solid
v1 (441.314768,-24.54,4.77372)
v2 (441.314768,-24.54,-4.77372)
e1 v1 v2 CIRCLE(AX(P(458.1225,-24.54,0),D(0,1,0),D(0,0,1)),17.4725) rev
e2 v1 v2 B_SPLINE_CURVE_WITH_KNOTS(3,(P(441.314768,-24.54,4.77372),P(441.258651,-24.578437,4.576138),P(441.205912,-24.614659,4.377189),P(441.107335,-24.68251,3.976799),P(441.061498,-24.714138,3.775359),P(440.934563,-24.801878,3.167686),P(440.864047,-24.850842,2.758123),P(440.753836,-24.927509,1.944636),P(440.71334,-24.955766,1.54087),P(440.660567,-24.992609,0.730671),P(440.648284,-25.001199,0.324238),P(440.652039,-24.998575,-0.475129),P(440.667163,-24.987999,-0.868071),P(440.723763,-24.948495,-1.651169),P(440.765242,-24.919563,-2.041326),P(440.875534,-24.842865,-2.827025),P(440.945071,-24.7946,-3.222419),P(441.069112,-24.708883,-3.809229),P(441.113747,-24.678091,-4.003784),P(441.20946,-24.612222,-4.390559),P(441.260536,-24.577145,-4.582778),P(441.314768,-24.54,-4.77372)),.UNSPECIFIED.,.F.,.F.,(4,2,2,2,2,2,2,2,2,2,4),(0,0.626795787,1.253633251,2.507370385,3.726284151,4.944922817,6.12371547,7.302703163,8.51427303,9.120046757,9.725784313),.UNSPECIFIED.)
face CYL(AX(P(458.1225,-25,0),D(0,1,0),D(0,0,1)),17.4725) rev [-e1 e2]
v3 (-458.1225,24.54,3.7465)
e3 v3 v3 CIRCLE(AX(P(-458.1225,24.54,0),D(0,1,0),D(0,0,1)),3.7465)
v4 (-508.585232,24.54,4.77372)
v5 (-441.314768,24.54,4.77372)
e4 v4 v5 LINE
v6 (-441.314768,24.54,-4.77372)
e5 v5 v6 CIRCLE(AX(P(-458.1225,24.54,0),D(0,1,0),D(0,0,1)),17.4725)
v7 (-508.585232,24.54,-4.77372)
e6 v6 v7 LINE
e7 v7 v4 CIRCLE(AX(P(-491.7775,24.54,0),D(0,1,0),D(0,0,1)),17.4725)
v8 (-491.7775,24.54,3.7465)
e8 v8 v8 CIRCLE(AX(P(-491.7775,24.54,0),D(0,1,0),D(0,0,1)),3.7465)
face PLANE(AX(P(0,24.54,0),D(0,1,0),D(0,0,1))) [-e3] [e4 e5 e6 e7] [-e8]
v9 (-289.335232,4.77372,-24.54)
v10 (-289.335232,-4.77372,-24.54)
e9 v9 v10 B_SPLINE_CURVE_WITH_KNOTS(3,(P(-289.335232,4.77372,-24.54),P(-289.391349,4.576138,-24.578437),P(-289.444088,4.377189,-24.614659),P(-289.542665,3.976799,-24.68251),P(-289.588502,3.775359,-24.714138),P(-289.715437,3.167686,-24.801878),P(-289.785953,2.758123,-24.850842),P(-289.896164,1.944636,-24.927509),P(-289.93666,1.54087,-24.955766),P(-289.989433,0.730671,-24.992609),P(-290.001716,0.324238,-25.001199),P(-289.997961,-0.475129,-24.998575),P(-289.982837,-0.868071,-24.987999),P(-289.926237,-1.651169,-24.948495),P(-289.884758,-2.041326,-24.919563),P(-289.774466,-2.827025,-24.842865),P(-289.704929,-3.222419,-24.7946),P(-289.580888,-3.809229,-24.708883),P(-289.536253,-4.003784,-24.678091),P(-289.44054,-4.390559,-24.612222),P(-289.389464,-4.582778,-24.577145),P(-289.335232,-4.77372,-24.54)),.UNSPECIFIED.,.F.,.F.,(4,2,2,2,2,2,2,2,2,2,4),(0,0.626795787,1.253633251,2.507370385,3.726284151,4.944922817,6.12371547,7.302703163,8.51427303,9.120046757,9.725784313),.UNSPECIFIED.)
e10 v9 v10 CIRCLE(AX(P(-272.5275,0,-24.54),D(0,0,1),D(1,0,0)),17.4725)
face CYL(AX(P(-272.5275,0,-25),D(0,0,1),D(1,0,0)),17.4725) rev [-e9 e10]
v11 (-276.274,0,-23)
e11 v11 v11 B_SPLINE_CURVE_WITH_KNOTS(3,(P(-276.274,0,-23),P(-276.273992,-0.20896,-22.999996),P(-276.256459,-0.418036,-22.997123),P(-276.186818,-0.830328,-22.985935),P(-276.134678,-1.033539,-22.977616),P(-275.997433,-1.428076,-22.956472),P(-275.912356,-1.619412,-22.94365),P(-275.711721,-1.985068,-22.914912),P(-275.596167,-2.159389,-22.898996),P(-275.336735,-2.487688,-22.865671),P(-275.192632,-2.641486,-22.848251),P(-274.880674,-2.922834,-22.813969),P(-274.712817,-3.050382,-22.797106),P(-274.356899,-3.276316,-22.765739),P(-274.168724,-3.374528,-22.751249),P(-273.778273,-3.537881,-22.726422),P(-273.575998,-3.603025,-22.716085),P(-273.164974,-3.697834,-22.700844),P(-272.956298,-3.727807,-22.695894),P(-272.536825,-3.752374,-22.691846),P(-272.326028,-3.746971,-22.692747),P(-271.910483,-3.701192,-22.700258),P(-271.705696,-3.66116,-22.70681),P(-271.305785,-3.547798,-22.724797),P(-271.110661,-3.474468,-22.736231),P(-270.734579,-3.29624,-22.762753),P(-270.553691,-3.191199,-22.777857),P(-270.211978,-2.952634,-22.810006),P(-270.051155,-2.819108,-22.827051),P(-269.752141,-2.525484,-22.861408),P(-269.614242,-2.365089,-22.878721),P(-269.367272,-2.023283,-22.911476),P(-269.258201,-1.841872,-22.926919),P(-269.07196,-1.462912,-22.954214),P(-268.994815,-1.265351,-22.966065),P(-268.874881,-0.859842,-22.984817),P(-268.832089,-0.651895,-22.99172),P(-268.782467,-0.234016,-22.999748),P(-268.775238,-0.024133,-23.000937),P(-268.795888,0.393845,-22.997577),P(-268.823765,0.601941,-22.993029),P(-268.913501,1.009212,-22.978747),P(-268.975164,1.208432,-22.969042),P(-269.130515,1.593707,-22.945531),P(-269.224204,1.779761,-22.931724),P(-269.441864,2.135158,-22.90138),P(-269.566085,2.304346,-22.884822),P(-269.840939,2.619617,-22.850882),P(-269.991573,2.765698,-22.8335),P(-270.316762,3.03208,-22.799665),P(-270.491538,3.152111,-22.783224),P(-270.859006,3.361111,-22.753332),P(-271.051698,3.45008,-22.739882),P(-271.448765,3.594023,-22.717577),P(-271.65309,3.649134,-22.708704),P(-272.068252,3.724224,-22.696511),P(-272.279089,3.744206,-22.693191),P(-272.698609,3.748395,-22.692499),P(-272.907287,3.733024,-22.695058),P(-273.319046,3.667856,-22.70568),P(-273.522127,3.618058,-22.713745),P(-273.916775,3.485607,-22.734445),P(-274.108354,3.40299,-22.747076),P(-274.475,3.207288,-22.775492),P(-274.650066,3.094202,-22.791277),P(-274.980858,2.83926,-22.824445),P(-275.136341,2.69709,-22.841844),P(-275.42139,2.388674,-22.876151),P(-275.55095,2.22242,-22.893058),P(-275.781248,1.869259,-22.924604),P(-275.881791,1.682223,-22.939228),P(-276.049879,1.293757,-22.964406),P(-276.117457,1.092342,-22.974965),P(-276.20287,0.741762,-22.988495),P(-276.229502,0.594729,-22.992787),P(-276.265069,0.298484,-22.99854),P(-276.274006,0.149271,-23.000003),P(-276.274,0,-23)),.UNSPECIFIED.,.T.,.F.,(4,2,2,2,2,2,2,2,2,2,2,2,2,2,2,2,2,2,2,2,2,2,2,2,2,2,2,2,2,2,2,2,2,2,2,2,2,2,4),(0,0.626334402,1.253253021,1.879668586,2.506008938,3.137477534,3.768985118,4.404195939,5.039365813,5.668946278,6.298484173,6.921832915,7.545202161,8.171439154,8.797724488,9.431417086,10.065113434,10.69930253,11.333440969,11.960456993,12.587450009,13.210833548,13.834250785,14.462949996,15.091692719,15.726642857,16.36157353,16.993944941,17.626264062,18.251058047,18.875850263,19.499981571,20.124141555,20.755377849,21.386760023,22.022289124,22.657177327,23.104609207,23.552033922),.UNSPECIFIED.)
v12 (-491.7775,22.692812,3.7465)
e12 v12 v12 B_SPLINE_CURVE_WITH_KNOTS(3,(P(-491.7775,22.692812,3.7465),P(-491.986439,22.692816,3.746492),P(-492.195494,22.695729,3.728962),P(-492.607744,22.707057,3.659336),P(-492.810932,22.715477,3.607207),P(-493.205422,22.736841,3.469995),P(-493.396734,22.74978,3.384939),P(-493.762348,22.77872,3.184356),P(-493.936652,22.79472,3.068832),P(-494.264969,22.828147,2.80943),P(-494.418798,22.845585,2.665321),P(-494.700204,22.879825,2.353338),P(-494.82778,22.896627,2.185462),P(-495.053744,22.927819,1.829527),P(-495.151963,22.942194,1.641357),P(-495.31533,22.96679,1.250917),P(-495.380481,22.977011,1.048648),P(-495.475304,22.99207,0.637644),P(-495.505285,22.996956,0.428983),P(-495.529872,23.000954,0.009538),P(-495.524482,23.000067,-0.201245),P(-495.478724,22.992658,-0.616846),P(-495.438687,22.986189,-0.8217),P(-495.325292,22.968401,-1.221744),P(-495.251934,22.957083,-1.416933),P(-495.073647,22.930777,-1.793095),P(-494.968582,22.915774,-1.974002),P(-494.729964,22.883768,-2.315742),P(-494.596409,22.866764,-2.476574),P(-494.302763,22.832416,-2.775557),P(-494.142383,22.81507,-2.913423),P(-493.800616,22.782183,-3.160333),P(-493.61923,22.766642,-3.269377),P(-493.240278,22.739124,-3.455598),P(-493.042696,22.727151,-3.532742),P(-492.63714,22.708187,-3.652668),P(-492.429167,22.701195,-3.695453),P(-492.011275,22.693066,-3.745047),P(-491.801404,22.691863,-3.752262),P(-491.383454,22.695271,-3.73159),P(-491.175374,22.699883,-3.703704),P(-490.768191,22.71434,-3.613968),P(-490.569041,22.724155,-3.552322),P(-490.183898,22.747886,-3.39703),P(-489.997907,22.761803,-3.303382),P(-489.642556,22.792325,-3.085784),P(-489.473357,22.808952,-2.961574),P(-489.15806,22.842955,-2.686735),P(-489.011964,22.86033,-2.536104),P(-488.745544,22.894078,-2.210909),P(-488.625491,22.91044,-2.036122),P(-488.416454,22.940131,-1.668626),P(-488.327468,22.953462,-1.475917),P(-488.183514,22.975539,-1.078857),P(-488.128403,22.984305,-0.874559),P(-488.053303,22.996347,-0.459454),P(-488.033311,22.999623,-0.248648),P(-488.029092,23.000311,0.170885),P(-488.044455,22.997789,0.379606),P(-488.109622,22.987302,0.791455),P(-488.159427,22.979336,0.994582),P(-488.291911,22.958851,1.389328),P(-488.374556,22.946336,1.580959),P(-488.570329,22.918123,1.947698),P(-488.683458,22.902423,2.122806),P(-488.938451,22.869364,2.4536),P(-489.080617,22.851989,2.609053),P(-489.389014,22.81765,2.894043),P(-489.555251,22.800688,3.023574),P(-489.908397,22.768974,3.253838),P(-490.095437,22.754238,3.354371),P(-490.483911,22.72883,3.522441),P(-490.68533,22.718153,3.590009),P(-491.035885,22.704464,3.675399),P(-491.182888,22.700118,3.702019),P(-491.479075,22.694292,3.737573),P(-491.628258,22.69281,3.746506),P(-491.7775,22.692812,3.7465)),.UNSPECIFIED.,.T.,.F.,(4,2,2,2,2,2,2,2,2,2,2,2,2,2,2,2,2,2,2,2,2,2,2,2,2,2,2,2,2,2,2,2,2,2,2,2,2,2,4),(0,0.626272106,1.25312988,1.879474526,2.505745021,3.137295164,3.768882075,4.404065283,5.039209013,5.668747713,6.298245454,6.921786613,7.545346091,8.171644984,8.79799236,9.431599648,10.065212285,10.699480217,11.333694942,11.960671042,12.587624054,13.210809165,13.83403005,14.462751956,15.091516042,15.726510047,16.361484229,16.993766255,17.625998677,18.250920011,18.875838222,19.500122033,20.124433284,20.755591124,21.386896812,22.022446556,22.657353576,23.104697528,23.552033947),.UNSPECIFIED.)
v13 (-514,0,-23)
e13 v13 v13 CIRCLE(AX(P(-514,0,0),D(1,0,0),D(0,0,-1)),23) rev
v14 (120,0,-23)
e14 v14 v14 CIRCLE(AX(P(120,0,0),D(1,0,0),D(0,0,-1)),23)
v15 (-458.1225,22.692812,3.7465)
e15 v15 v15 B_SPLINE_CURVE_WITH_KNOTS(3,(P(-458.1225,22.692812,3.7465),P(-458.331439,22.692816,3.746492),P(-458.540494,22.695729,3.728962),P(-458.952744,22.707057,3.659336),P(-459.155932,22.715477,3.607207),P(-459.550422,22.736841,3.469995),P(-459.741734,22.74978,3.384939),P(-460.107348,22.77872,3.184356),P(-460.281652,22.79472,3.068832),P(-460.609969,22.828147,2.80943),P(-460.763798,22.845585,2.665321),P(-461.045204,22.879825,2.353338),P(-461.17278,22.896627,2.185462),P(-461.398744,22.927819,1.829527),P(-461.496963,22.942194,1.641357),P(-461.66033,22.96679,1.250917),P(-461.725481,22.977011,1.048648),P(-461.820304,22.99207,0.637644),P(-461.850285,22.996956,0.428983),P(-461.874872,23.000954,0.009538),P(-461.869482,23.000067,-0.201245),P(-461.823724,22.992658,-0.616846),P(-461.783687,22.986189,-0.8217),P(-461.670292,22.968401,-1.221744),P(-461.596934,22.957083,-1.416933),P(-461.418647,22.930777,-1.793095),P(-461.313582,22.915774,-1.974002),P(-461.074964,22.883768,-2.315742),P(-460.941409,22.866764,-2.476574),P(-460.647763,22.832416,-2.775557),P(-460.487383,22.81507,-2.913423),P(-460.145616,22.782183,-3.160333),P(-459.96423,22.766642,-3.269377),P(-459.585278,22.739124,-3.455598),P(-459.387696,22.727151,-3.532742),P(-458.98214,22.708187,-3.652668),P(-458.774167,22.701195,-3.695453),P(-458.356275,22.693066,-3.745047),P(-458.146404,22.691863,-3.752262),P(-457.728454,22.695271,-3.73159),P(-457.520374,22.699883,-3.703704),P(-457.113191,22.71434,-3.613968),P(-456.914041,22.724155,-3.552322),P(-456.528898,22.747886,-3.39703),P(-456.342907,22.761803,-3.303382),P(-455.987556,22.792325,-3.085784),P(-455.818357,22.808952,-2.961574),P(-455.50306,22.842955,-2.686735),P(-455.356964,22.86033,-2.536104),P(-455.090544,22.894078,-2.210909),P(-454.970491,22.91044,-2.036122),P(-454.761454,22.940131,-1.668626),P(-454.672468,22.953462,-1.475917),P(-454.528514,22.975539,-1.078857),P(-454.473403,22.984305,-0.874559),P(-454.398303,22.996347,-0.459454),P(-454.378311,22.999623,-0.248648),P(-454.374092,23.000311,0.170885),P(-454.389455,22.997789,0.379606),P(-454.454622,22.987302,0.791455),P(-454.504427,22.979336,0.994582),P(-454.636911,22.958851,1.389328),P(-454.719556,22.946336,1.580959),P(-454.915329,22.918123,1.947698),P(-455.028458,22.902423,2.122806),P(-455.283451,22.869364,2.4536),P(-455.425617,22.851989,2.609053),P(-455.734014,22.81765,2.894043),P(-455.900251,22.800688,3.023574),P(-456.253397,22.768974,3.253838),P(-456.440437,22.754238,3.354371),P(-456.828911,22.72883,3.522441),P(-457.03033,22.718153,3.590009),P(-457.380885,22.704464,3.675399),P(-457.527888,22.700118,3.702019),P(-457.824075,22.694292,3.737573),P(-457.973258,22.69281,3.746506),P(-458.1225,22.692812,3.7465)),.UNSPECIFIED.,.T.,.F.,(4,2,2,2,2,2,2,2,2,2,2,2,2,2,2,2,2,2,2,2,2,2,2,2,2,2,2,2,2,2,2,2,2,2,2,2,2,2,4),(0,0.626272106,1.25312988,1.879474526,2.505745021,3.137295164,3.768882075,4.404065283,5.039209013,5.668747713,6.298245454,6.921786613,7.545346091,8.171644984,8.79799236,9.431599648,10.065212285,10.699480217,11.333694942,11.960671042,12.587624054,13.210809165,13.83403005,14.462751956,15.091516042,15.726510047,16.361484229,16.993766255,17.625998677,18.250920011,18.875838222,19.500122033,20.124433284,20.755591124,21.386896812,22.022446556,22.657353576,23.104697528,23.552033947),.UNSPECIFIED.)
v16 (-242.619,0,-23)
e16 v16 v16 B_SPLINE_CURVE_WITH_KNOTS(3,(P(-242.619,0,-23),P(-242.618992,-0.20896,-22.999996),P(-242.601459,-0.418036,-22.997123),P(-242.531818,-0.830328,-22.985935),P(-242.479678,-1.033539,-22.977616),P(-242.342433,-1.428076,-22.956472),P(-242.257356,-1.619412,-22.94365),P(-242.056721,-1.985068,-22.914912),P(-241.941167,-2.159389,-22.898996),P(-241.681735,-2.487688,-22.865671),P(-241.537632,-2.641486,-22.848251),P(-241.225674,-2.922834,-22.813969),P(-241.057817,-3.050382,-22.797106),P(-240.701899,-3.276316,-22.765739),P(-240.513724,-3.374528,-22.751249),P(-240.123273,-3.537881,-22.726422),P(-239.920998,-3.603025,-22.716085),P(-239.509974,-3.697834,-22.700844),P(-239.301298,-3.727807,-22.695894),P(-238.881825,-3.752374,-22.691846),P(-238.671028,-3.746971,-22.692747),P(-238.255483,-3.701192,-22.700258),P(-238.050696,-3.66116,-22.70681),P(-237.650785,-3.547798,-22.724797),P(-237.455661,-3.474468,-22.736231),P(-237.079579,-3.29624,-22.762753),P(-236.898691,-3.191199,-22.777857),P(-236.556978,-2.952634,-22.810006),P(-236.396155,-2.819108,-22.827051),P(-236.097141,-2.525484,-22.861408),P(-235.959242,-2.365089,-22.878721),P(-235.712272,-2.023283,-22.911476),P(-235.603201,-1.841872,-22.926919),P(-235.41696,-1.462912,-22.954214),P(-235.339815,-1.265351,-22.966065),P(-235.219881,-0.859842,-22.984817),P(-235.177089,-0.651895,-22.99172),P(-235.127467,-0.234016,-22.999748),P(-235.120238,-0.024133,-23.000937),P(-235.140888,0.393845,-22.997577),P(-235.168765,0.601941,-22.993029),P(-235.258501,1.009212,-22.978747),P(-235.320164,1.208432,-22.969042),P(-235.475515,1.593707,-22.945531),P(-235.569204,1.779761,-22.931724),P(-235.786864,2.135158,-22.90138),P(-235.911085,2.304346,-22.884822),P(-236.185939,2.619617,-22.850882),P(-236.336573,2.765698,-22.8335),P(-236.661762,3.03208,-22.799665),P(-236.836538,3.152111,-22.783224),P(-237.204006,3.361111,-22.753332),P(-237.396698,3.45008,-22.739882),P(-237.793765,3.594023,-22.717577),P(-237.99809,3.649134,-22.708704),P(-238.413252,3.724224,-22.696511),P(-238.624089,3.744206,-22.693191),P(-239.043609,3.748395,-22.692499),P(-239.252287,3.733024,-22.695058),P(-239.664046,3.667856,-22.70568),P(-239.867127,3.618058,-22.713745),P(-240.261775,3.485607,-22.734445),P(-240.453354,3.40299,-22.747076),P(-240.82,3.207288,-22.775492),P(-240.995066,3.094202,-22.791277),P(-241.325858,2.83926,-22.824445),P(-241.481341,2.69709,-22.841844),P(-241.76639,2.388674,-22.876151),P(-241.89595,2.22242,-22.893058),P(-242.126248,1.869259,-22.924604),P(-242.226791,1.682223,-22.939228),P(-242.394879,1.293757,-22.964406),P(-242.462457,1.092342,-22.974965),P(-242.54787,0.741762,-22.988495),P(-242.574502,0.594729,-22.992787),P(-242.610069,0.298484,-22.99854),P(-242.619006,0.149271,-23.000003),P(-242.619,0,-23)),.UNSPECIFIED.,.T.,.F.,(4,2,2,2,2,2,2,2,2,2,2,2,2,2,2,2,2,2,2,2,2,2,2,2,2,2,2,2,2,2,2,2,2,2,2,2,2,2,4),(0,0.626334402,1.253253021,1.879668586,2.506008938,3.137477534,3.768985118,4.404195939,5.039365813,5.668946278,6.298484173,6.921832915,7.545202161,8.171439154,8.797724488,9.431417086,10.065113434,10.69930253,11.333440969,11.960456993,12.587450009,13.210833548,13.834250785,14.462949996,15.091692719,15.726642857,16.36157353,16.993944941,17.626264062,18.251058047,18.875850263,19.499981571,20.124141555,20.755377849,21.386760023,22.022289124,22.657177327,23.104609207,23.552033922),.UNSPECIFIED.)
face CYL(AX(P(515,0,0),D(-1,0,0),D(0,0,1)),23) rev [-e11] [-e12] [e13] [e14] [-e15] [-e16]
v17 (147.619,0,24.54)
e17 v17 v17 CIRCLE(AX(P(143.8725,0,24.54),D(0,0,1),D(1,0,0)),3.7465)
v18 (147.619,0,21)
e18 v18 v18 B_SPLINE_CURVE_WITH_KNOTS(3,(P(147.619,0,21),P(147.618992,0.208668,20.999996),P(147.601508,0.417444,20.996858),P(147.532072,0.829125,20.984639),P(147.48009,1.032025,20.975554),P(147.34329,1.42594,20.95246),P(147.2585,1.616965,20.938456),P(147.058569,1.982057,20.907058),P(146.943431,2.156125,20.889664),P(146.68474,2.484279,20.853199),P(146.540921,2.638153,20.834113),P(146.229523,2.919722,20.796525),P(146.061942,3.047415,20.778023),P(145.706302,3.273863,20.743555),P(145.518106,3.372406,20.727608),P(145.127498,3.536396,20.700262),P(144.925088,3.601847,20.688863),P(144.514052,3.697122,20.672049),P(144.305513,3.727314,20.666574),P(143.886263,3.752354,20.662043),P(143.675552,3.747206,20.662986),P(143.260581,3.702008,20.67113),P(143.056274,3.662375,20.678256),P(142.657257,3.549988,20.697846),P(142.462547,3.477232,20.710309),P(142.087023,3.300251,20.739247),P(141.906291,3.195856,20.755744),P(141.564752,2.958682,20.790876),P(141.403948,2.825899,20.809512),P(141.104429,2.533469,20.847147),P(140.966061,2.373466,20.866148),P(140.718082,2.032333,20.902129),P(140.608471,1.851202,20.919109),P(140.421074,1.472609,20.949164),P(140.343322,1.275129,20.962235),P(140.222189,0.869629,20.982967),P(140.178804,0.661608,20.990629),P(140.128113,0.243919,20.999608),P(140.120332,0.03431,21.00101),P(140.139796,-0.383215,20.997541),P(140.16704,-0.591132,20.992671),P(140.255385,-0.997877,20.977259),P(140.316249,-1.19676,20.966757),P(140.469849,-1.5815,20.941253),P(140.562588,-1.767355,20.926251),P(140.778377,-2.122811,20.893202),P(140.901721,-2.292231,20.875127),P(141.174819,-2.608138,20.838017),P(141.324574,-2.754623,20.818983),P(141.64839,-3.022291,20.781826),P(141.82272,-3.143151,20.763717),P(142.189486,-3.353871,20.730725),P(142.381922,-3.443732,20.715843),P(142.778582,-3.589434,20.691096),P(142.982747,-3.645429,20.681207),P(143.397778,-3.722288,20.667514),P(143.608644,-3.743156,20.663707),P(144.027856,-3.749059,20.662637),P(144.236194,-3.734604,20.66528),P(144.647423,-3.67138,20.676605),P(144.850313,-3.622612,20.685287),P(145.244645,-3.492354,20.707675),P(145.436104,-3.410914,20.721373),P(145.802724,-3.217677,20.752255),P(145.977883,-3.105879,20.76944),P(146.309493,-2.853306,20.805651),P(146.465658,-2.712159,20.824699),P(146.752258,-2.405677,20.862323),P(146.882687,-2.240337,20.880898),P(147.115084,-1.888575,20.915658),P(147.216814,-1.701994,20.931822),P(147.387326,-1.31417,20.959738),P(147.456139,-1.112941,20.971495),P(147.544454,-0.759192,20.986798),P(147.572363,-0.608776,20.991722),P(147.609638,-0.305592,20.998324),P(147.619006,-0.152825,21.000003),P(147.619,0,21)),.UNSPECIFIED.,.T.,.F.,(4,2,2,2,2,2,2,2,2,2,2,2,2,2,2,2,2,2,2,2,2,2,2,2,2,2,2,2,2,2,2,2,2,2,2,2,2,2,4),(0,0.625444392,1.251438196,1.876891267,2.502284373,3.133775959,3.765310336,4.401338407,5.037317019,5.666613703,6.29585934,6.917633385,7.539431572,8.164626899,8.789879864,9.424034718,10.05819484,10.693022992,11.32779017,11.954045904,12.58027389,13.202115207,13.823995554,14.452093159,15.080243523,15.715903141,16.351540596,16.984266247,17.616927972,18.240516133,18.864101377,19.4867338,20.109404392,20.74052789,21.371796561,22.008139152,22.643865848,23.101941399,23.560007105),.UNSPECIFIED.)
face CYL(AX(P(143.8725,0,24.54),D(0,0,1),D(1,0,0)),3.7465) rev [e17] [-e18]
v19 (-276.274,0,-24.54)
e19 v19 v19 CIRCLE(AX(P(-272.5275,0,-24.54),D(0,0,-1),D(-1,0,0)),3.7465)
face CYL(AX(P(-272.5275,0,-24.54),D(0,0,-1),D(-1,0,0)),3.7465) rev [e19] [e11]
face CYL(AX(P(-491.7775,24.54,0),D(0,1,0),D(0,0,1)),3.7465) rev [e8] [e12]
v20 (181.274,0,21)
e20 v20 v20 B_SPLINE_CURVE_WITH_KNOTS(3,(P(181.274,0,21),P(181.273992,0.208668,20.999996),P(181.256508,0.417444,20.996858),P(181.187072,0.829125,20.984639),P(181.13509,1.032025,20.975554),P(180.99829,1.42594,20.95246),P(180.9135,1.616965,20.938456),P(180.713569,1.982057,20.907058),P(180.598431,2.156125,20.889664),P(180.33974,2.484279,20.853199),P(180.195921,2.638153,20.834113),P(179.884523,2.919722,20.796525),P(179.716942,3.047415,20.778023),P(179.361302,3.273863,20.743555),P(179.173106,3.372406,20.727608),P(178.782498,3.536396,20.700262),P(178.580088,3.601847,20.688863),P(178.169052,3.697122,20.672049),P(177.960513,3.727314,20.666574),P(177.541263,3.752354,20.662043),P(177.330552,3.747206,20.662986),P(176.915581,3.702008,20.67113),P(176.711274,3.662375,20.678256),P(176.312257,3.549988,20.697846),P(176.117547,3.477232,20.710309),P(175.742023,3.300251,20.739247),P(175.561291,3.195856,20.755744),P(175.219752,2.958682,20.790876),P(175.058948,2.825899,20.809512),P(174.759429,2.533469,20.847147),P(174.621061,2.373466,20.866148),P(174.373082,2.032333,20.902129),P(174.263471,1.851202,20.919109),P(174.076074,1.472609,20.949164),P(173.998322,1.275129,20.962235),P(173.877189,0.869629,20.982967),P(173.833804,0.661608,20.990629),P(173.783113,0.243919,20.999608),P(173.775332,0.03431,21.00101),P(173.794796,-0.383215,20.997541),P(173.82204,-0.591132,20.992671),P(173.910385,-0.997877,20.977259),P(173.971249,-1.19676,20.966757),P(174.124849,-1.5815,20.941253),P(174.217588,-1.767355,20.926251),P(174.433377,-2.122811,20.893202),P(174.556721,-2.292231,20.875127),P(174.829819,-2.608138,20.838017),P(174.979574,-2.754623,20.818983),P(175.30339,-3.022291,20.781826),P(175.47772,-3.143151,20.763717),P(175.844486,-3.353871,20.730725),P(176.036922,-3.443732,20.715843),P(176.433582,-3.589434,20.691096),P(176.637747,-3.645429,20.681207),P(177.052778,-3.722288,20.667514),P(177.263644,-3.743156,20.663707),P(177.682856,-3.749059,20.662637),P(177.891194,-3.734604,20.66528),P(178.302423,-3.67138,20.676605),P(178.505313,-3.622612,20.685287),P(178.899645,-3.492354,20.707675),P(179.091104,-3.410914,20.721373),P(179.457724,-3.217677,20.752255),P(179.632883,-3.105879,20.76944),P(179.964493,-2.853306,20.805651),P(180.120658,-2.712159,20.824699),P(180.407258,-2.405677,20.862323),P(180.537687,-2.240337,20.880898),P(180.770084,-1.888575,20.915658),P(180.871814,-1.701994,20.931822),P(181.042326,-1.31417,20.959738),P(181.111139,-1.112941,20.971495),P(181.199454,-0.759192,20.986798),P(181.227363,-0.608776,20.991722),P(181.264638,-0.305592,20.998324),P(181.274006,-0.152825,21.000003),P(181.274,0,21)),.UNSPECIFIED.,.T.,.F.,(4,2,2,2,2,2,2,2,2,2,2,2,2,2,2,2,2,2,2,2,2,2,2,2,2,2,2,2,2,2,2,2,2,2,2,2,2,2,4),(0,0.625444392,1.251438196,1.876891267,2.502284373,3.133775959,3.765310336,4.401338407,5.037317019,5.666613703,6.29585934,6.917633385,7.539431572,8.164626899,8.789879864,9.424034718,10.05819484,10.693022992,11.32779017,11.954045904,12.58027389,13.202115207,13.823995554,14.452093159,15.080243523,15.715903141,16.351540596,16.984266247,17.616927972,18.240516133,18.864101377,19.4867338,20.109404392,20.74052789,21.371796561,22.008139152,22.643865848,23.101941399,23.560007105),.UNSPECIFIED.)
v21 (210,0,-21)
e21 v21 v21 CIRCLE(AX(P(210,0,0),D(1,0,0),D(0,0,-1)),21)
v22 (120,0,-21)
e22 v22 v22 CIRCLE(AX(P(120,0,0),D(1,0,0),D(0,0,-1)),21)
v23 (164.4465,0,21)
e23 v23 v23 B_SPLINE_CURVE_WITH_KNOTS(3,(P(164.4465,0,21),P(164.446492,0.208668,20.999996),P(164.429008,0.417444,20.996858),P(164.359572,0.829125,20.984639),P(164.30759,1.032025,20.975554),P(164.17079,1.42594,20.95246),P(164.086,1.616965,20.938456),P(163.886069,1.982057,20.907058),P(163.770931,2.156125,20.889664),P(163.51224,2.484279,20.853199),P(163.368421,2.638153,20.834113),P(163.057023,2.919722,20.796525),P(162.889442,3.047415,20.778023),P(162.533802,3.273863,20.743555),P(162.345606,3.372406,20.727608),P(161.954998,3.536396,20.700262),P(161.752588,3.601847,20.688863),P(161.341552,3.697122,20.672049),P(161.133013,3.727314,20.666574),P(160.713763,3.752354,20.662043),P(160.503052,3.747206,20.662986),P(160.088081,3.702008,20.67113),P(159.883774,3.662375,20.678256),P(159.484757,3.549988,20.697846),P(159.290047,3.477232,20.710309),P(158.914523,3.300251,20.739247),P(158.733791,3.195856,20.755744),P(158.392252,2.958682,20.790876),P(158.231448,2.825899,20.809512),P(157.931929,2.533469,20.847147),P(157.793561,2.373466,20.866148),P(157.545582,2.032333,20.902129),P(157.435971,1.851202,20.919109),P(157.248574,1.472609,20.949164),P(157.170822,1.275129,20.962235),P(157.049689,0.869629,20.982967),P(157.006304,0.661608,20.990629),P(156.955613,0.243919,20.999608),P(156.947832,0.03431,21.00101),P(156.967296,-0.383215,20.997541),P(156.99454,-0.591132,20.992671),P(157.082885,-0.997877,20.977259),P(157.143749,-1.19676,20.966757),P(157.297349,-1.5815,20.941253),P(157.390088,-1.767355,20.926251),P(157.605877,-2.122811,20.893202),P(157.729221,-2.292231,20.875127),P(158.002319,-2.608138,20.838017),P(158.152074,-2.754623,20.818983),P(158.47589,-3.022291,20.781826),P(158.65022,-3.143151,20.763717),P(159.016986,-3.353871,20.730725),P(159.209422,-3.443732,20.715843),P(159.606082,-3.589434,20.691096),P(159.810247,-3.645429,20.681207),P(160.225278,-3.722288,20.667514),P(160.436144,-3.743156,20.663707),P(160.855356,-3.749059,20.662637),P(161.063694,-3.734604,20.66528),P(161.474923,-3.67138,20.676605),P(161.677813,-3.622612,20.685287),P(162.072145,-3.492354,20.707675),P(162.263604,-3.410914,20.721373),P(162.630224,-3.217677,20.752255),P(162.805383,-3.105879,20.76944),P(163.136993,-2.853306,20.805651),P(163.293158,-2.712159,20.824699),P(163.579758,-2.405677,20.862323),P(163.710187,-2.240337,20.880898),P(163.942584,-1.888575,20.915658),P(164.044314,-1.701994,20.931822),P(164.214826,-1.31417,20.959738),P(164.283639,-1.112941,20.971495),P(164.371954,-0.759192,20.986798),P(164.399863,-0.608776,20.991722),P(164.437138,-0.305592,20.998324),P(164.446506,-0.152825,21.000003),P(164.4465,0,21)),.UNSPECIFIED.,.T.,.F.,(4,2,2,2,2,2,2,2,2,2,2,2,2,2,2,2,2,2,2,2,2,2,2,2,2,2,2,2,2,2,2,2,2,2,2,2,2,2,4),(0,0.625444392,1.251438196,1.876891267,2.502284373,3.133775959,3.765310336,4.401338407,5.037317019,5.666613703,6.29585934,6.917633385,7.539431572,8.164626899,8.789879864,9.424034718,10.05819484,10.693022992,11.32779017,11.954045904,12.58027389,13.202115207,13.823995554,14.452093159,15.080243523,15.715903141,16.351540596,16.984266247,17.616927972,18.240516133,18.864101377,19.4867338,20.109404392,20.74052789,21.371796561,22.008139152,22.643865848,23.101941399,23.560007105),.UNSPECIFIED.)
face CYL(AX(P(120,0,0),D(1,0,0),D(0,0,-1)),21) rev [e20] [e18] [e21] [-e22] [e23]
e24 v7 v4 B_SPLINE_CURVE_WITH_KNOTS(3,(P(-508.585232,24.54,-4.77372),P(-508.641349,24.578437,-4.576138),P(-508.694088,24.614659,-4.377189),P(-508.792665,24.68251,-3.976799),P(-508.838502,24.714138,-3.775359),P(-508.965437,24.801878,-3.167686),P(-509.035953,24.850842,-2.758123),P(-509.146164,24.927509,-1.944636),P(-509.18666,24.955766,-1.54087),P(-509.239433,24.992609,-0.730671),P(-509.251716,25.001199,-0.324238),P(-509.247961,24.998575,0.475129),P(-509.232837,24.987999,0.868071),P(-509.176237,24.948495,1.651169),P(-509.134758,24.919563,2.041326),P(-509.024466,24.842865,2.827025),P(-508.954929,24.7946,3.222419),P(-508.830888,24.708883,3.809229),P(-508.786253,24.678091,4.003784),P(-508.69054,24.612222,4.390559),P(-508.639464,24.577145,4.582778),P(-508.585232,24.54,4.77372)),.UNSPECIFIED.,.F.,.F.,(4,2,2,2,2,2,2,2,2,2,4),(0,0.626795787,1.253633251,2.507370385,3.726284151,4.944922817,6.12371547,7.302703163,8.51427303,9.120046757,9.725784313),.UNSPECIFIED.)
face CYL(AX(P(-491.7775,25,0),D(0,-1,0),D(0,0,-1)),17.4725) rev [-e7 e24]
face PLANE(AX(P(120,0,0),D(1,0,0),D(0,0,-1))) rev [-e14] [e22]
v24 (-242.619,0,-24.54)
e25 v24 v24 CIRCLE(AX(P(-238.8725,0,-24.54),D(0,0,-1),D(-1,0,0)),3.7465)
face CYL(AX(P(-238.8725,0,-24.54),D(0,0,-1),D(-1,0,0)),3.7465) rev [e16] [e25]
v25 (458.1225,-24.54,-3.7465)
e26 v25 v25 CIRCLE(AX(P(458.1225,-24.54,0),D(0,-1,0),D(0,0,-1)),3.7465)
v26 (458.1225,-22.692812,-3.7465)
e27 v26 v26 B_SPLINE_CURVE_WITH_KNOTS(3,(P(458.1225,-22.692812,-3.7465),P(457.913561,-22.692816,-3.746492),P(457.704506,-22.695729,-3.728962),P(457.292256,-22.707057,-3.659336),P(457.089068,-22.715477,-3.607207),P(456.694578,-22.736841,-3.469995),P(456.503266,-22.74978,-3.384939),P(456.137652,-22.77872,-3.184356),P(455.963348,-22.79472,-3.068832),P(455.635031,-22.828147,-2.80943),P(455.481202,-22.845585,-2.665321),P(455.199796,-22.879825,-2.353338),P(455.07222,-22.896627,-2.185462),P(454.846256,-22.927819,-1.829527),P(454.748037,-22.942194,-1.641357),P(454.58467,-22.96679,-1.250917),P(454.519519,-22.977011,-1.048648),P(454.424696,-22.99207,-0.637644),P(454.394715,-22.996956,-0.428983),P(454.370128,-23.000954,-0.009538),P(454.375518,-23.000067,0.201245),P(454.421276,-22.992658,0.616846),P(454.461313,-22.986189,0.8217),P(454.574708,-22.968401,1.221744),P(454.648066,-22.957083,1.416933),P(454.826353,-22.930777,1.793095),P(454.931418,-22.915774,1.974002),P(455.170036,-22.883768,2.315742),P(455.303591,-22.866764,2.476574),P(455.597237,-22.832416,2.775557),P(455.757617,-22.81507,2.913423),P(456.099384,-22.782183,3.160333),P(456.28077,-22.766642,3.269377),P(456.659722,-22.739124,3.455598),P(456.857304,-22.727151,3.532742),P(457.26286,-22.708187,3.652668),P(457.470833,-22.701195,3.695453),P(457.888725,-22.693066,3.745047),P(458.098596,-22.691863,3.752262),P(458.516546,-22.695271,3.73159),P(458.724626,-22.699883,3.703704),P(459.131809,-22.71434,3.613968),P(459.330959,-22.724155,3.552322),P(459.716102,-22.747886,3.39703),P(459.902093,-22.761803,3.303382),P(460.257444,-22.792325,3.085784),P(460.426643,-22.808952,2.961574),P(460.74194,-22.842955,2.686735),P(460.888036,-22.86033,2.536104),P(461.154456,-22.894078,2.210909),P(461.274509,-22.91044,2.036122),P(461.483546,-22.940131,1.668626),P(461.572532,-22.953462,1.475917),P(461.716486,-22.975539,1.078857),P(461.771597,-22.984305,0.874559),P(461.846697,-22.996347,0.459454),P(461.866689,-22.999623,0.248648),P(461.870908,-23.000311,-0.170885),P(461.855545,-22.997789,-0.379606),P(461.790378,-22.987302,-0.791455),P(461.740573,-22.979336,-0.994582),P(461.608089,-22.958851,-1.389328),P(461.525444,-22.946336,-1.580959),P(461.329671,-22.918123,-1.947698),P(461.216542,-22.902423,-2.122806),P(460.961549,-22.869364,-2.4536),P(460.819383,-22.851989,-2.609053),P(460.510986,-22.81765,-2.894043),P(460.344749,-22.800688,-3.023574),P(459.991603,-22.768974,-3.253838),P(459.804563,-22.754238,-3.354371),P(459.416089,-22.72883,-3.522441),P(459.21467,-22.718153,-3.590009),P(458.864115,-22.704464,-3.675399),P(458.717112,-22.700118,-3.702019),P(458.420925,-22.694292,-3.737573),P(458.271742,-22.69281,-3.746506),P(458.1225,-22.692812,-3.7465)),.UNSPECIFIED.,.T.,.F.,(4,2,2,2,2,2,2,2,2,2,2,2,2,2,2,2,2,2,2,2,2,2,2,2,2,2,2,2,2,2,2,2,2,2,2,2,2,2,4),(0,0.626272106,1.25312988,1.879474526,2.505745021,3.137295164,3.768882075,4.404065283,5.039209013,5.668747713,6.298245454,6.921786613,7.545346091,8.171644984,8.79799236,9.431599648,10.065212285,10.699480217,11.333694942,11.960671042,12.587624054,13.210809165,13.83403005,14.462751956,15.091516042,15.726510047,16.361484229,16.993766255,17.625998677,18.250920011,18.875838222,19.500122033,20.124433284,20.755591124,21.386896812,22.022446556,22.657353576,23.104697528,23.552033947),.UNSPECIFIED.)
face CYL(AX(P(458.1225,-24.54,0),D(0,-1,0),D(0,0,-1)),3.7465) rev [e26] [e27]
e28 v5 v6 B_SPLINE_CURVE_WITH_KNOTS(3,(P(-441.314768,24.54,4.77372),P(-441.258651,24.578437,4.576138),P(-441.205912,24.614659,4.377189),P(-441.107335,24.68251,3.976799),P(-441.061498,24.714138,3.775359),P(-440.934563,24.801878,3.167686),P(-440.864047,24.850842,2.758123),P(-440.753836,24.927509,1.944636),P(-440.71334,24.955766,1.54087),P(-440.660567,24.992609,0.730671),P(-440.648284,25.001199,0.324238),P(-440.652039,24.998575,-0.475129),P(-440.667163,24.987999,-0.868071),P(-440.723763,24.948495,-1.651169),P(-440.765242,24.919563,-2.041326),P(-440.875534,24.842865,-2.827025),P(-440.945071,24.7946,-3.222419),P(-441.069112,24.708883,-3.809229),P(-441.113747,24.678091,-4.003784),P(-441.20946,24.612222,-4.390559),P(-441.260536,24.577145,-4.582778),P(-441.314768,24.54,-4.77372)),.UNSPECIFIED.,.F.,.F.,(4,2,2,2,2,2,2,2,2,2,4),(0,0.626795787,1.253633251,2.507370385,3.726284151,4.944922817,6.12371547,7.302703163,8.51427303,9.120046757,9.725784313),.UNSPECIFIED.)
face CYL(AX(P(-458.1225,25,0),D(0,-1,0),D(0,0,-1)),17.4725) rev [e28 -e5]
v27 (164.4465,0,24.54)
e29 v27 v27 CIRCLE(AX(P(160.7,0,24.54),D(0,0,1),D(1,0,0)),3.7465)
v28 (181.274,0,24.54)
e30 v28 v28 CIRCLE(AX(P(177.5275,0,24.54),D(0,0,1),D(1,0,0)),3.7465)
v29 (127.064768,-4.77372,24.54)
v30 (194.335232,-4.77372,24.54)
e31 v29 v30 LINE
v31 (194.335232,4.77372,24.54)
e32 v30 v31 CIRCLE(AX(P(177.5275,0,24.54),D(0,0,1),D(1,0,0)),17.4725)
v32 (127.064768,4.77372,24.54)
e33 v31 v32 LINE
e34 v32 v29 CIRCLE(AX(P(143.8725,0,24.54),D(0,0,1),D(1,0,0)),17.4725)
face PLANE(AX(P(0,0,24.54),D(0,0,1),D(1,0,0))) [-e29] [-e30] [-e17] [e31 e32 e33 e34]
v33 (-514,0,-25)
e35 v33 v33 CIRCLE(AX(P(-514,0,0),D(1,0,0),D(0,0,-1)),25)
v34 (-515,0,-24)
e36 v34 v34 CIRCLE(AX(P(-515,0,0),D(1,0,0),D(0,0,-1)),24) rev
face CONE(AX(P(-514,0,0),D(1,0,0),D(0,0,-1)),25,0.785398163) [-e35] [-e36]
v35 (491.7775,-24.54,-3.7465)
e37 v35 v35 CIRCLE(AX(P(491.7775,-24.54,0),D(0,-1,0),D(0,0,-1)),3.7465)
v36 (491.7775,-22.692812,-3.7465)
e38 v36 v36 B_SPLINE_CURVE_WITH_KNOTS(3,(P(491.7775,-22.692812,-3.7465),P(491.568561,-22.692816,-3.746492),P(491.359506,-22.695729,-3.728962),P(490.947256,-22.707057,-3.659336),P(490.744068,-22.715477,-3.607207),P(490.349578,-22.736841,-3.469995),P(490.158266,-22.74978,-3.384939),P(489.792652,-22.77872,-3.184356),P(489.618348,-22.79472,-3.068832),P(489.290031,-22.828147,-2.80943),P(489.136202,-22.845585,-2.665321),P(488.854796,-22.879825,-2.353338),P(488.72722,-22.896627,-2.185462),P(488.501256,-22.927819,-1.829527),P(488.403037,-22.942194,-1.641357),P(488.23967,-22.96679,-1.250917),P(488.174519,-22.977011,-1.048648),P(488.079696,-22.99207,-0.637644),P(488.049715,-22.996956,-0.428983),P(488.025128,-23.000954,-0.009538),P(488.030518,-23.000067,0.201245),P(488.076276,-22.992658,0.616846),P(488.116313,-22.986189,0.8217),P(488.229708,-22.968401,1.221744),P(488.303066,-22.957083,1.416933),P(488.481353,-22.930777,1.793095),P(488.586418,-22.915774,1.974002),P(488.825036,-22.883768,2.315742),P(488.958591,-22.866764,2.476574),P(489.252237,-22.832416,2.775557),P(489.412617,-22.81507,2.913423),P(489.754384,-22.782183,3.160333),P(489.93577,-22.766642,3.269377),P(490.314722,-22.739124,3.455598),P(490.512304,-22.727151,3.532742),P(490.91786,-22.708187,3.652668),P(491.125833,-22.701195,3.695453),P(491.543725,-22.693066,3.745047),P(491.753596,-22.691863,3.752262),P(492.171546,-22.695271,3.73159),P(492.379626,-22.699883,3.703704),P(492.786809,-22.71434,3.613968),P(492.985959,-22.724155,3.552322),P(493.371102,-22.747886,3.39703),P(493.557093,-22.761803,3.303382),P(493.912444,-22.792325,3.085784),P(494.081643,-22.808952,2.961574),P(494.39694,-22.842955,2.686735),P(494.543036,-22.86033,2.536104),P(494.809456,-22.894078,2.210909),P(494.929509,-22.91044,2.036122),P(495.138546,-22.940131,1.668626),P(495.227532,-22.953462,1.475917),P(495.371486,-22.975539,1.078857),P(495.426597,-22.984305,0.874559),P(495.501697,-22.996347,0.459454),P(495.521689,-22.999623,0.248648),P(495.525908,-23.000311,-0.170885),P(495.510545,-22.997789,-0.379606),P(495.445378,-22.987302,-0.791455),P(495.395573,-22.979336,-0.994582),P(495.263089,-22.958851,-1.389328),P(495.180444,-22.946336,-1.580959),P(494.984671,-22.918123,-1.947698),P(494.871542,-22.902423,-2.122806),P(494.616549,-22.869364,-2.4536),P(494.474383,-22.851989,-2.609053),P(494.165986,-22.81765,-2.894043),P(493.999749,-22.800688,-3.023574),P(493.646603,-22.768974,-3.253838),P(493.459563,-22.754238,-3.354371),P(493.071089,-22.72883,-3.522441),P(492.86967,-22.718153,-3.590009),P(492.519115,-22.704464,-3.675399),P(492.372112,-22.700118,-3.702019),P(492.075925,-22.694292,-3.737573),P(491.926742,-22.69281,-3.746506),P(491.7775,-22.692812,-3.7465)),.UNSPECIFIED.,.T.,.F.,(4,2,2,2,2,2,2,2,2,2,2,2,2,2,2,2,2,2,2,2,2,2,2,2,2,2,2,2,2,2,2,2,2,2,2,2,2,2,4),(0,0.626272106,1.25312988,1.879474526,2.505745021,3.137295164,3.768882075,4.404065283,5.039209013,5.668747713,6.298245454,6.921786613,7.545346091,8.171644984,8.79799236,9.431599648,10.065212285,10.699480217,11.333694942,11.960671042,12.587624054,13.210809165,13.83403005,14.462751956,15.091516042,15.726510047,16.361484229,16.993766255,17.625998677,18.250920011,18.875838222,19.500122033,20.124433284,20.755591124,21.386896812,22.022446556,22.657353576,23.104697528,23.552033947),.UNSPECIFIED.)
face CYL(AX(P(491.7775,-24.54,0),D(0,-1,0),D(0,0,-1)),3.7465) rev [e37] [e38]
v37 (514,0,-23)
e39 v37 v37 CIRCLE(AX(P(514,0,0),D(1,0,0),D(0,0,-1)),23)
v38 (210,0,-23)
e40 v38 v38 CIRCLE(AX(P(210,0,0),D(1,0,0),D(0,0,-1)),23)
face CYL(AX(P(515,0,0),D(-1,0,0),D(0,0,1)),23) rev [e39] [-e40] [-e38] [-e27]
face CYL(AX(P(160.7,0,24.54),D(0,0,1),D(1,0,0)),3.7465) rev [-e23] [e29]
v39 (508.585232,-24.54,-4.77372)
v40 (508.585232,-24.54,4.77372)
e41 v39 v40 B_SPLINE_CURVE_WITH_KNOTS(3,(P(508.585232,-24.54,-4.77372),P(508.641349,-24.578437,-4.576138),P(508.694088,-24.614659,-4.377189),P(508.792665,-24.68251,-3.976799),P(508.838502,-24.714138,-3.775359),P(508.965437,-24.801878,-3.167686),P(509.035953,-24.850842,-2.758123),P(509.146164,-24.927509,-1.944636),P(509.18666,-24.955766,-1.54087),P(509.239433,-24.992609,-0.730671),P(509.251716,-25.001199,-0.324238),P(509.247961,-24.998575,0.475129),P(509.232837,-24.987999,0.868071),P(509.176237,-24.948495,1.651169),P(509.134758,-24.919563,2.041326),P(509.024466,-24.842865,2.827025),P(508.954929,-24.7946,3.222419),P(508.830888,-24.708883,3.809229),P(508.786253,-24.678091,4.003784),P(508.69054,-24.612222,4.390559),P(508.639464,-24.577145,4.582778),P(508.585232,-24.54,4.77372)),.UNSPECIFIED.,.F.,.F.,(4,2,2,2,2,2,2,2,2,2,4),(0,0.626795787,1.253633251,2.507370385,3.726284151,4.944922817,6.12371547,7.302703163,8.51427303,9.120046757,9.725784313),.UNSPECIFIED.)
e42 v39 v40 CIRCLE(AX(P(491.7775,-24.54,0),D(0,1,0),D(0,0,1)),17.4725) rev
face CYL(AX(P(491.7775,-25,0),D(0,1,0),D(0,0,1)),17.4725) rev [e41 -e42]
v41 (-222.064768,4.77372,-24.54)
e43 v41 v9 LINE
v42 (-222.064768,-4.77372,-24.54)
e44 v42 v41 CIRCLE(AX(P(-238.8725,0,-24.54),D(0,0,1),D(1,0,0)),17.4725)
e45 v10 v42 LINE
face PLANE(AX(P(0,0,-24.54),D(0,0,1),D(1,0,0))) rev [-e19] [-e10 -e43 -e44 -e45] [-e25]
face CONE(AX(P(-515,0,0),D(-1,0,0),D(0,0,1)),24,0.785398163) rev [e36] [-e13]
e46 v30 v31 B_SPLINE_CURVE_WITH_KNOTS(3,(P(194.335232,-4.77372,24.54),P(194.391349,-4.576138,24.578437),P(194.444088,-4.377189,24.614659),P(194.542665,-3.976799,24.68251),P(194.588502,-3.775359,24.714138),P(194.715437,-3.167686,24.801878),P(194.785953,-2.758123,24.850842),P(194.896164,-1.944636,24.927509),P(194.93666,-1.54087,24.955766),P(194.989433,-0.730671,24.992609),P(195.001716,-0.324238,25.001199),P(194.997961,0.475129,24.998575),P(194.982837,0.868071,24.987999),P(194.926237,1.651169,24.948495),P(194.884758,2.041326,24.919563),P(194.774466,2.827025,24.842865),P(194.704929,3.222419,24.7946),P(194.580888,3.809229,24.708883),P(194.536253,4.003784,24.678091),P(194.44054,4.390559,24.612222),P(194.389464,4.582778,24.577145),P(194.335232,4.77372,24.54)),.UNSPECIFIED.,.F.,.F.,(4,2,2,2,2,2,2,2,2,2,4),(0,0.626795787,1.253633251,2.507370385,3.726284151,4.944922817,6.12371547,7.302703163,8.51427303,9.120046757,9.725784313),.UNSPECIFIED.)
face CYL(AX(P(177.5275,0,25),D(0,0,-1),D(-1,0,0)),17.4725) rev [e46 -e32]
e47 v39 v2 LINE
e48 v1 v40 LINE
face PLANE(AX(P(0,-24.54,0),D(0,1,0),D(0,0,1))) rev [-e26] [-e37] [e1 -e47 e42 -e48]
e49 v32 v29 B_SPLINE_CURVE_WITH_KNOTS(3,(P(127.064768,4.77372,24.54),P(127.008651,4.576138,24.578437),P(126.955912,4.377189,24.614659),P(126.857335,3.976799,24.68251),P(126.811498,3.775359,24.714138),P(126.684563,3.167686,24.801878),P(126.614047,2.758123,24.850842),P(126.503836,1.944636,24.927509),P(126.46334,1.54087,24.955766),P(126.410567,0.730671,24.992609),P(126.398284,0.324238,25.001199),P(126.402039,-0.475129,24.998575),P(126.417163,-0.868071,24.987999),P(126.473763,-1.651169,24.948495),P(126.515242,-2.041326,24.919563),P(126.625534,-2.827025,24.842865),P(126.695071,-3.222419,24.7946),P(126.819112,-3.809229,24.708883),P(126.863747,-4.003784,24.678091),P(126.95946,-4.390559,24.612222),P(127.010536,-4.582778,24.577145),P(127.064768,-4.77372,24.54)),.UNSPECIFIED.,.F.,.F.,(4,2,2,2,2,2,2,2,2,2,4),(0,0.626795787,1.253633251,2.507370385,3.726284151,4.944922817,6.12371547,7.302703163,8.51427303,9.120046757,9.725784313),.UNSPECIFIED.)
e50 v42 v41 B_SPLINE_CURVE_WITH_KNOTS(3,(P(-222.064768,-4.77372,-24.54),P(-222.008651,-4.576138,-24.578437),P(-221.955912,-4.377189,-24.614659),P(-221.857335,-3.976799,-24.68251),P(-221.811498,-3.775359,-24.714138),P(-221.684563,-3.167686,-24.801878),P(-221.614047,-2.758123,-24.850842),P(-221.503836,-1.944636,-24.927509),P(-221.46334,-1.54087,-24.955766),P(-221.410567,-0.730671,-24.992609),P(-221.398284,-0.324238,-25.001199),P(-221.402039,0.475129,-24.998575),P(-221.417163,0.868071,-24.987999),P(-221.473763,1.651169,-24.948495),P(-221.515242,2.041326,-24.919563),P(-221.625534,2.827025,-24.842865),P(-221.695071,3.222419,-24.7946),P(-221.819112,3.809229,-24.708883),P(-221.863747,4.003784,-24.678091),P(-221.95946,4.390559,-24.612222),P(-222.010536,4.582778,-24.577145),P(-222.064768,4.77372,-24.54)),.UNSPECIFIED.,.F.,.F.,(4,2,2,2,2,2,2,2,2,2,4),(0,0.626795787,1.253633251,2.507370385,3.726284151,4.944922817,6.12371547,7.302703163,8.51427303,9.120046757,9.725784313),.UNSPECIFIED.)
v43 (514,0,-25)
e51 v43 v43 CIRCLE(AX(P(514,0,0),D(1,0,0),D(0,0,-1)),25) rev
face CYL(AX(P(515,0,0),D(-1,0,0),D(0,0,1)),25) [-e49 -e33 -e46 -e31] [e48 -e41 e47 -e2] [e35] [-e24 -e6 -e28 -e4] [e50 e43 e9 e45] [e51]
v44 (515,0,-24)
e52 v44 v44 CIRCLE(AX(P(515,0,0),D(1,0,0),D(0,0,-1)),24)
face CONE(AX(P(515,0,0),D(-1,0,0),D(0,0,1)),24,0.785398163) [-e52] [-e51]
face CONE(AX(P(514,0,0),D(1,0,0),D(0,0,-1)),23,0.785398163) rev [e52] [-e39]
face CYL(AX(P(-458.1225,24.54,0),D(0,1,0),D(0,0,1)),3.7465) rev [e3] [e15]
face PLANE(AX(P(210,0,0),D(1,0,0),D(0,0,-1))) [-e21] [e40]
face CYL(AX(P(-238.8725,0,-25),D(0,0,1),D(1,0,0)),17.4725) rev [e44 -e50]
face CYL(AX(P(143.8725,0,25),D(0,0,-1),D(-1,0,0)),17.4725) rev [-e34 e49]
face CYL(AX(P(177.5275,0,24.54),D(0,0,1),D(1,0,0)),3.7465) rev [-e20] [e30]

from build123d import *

# Parameters (mm, degrees)
SKETCH1_R                     = 25
SKETCH1_R_2                   = 23
EXTRUDE_THIN1_DEPTH           = 515
EXTRUDE_THIN2_START           = 210
SKETCH1_3_R                   = 25
SKETCH1_3_R_2                 = 21
EXTRUDE_THIN2_DEPTH           = 90
CUT_EXTRUDE1_START            = 24.54
CUT_EXTRUDE1_DEPTH            = 492.672165684
CUT_EXTRUDE2_START            = -24.54
CUT_EXTRUDE2_DEPTH            = 492.672165793
CUT_EXTRUDE3_START            = -24.54
CUT_EXTRUDE3_DEPTH            = 492.672165793
CUT_EXTRUDE4_START            = 24.54
CUT_EXTRUDE4_DEPTH            = 492.672165793
M_0_295_DIAMETER_HOLE3_REACH  = 519.981
M_0_295_DIAMETER_HOLE3_BORE_R = 3.7465
M_0_295_DIAMETER_HOLE4_REACH  = 519.981
M_0_295_DIAMETER_HOLE4_BORE_R = 3.7465
M_0_295_DIAMETER_HOLE5_REACH  = 519.981
M_0_295_DIAMETER_HOLE5_BORE_R = 3.7465
M_0_295_DIAMETER_HOLE6_REACH  = 519.981
M_0_295_DIAMETER_HOLE6_BORE_R = 3.7465
CHAMFER1_SIZE                 = 1


with BuildPart() as part:
    # Sketch1 → Extrude-Thin1 (new, symmetric)
    with BuildSketch(Plane(origin=(0, 0, 0), x_dir=(0, 0, -1), z_dir=(1, 0, 0))):
        Circle(SKETCH1_R)
        Circle(SKETCH1_R_2, mode=Mode.SUBTRACT)
    extrude(amount=EXTRUDE_THIN1_DEPTH, both=True)

    # Sketch1<3> → Extrude-Thin2 (add)
    with BuildSketch(Plane(origin=(0, 0, 0), x_dir=(0, 0, -1), z_dir=(1, 0, 0)).offset(EXTRUDE_THIN2_START)):
        Circle(SKETCH1_3_R)
        Circle(SKETCH1_3_R_2, mode=Mode.SUBTRACT)
    extrude(amount=-EXTRUDE_THIN2_DEPTH)

    # Sketch3 → Cut-Extrude1 (cut, through all)
    with BuildSketch(Plane(origin=(0, 0, 0), x_dir=(1, 0, 0), z_dir=(0, 1, 0)).offset(CUT_EXTRUDE1_START)):
        with BuildLine():
            Line((-491.7775, -17.4725), (-458.1225, -17.4725))
            ThreePointArc((-458.1225, -17.4725), (-440.65, 0), (-458.1225, 17.4725))
            Line((-458.1225, 17.4725), (-491.7775, 17.4725))
            ThreePointArc((-491.7775, 17.4725), (-509.25, 0), (-491.7775, -17.4725))
        make_face()
    extrude(amount=CUT_EXTRUDE1_DEPTH, mode=Mode.SUBTRACT)

    # Sketch8 → Cut-Extrude2 (cut, through all)
    with BuildSketch(Plane.XY.offset(CUT_EXTRUDE2_START)):
        with BuildLine():
            Line((-272.5275, -17.4725), (-238.8725, -17.4725))
            ThreePointArc((-238.8725, -17.4725), (-221.4, 0), (-238.8725, 17.4725))
            Line((-238.8725, 17.4725), (-272.5275, 17.4725))
            ThreePointArc((-272.5275, 17.4725), (-290, 0), (-272.5275, -17.4725))
        make_face()
    extrude(amount=-CUT_EXTRUDE2_DEPTH, mode=Mode.SUBTRACT)

    # Sketch3<3> → Cut-Extrude3 (cut, through all)
    with BuildSketch(Plane(origin=(0, 0, 0), x_dir=(1, 0, 0), z_dir=(0, 1, 0)).offset(CUT_EXTRUDE3_START)):
        with BuildLine():
            ThreePointArc((458.1225, -17.4725), (440.65, 0), (458.1225, 17.4725))
            Line((458.1225, 17.4725), (491.7775, 17.4725))
            ThreePointArc((491.7775, 17.4725), (509.25, 0), (491.7775, -17.4725))
            Line((491.7775, -17.4725), (458.1225, -17.4725))
        make_face()
    extrude(amount=-CUT_EXTRUDE3_DEPTH, mode=Mode.SUBTRACT)

    # Sketch8<4> → Cut-Extrude4 (cut, through all)
    with BuildSketch(Plane.XY.offset(CUT_EXTRUDE4_START)):
        with BuildLine():
            Line((143.8725, -17.4725), (177.5275, -17.4725))
            ThreePointArc((177.5275, -17.4725), (195, 0), (177.5275, 17.4725))
            Line((177.5275, 17.4725), (143.8725, 17.4725))
            ThreePointArc((143.8725, 17.4725), (126.4, 0), (143.8725, -17.4725))
        make_face()
    extrude(amount=CUT_EXTRUDE4_DEPTH, mode=Mode.SUBTRACT)

    # M (0.295) Diameter Hole3 bore → M (0.295) Diameter Hole3 (cut, up to next)
    with BuildSketch(Plane(origin=(0, 24.54, 0), x_dir=(1, 0, 0), z_dir=(0, 1, 0)), mode=Mode.PRIVATE) as m_0_295_diameter_hole3_sk1:
        with Locations((-491.7775, 0)):
            Circle(M_0_295_DIAMETER_HOLE3_BORE_R)
    m_0_295_diameter_hole3_tool1 = extrude(m_0_295_diameter_hole3_sk1.sketch, amount=-M_0_295_DIAMETER_HOLE3_REACH, mode=Mode.PRIVATE) & part.part
    # M (0.295) Diameter Hole3 bore → M (0.295) Diameter Hole3 (cut, up to next)
    with BuildSketch(Plane(origin=(0, 24.54, 0), x_dir=(1, 0, 0), z_dir=(0, 1, 0)), mode=Mode.PRIVATE) as m_0_295_diameter_hole3_sk2:
        with Locations((-458.1225, 0)):
            Circle(M_0_295_DIAMETER_HOLE3_BORE_R)
    m_0_295_diameter_hole3_tool2 = extrude(m_0_295_diameter_hole3_sk2.sketch, amount=-M_0_295_DIAMETER_HOLE3_REACH, mode=Mode.PRIVATE) & part.part
    add(m_0_295_diameter_hole3_tool1.solids().sort_by_distance((-491.7775, 24.54, 0))[0], mode=Mode.SUBTRACT)
    add(m_0_295_diameter_hole3_tool2.solids().sort_by_distance((-458.1225, 24.54, 0))[0], mode=Mode.SUBTRACT)

    # M (0.295) Diameter Hole4 bore → M (0.295) Diameter Hole4 (cut, up to next)
    with BuildSketch(Plane(origin=(0, 0, -24.54), x_dir=(-1, 0, 0), z_dir=(0, 0, -1)), mode=Mode.PRIVATE) as m_0_295_diameter_hole4_sk1:
        with Locations((238.8725, 0)):
            Circle(M_0_295_DIAMETER_HOLE4_BORE_R)
    m_0_295_diameter_hole4_tool1 = extrude(m_0_295_diameter_hole4_sk1.sketch, amount=-M_0_295_DIAMETER_HOLE4_REACH, mode=Mode.PRIVATE) & part.part
    # M (0.295) Diameter Hole4 bore → M (0.295) Diameter Hole4 (cut, up to next)
    with BuildSketch(Plane(origin=(0, 0, -24.54), x_dir=(-1, 0, 0), z_dir=(0, 0, -1)), mode=Mode.PRIVATE) as m_0_295_diameter_hole4_sk2:
        with Locations((272.5275, 0)):
            Circle(M_0_295_DIAMETER_HOLE4_BORE_R)
    m_0_295_diameter_hole4_tool2 = extrude(m_0_295_diameter_hole4_sk2.sketch, amount=-M_0_295_DIAMETER_HOLE4_REACH, mode=Mode.PRIVATE) & part.part
    add(m_0_295_diameter_hole4_tool1.solids().sort_by_distance((-238.8725, 0, -24.54))[0], mode=Mode.SUBTRACT)
    add(m_0_295_diameter_hole4_tool2.solids().sort_by_distance((-272.5275, 0, -24.54))[0], mode=Mode.SUBTRACT)

    # M (0.295) Diameter Hole5 bore → M (0.295) Diameter Hole5 (cut, up to next)
    with BuildSketch(Plane.XY.offset(24.54), mode=Mode.PRIVATE) as m_0_295_diameter_hole5_sk1:
        with Locations((143.8725, 0)):
            Circle(M_0_295_DIAMETER_HOLE5_BORE_R)
    m_0_295_diameter_hole5_tool1 = extrude(m_0_295_diameter_hole5_sk1.sketch, amount=-M_0_295_DIAMETER_HOLE5_REACH, mode=Mode.PRIVATE) & part.part
    # M (0.295) Diameter Hole5 bore → M (0.295) Diameter Hole5 (cut, up to next)
    with BuildSketch(Plane.XY.offset(24.54), mode=Mode.PRIVATE) as m_0_295_diameter_hole5_sk2:
        with Locations((160.7, 0)):
            Circle(M_0_295_DIAMETER_HOLE5_BORE_R)
    m_0_295_diameter_hole5_tool2 = extrude(m_0_295_diameter_hole5_sk2.sketch, amount=-M_0_295_DIAMETER_HOLE5_REACH, mode=Mode.PRIVATE) & part.part
    # M (0.295) Diameter Hole5 bore → M (0.295) Diameter Hole5 (cut, up to next)
    with BuildSketch(Plane.XY.offset(24.54), mode=Mode.PRIVATE) as m_0_295_diameter_hole5_sk3:
        with Locations((177.5275, 0)):
            Circle(M_0_295_DIAMETER_HOLE5_BORE_R)
    m_0_295_diameter_hole5_tool3 = extrude(m_0_295_diameter_hole5_sk3.sketch, amount=-M_0_295_DIAMETER_HOLE5_REACH, mode=Mode.PRIVATE) & part.part
    add(m_0_295_diameter_hole5_tool1.solids().sort_by_distance((143.8725, 0, 24.54))[0], mode=Mode.SUBTRACT)
    add(m_0_295_diameter_hole5_tool2.solids().sort_by_distance((160.7, 0, 24.54))[0], mode=Mode.SUBTRACT)
    add(m_0_295_diameter_hole5_tool3.solids().sort_by_distance((177.5275, 0, 24.54))[0], mode=Mode.SUBTRACT)

    # M (0.295) Diameter Hole6 bore → M (0.295) Diameter Hole6 (cut, up to next)
    with BuildSketch(Plane(origin=(0, -24.54, 0), x_dir=(-1, 0, 0), z_dir=(0, -1, 0)), mode=Mode.PRIVATE) as m_0_295_diameter_hole6_sk1:
        with Locations((-491.7775, 0)):
            Circle(M_0_295_DIAMETER_HOLE6_BORE_R)
    m_0_295_diameter_hole6_tool1 = extrude(m_0_295_diameter_hole6_sk1.sketch, amount=-M_0_295_DIAMETER_HOLE6_REACH, mode=Mode.PRIVATE) & part.part
    # M (0.295) Diameter Hole6 bore → M (0.295) Diameter Hole6 (cut, up to next)
    with BuildSketch(Plane(origin=(0, -24.54, 0), x_dir=(-1, 0, 0), z_dir=(0, -1, 0)), mode=Mode.PRIVATE) as m_0_295_diameter_hole6_sk2:
        with Locations((-458.1225, 0)):
            Circle(M_0_295_DIAMETER_HOLE6_BORE_R)
    m_0_295_diameter_hole6_tool2 = extrude(m_0_295_diameter_hole6_sk2.sketch, amount=-M_0_295_DIAMETER_HOLE6_REACH, mode=Mode.PRIVATE) & part.part
    add(m_0_295_diameter_hole6_tool1.solids().sort_by_distance((491.7775, -24.54, 0))[0], mode=Mode.SUBTRACT)
    add(m_0_295_diameter_hole6_tool2.solids().sort_by_distance((458.1225, -24.54, 0))[0], mode=Mode.SUBTRACT)

    # Chamfer1
    chamfer1_edges = [part.edges().sort_by_distance(p)[0] for p in [
        (-515, 0, 25),
        (-515, 0, 23),
        (515, 0, 25),
        (515, 0, 23),
    ]]
    chamfer(chamfer1_edges, length=CHAMFER1_SIZE - 0.0001)  # a hair under: the kernel refuses the full size


solid = part.part
